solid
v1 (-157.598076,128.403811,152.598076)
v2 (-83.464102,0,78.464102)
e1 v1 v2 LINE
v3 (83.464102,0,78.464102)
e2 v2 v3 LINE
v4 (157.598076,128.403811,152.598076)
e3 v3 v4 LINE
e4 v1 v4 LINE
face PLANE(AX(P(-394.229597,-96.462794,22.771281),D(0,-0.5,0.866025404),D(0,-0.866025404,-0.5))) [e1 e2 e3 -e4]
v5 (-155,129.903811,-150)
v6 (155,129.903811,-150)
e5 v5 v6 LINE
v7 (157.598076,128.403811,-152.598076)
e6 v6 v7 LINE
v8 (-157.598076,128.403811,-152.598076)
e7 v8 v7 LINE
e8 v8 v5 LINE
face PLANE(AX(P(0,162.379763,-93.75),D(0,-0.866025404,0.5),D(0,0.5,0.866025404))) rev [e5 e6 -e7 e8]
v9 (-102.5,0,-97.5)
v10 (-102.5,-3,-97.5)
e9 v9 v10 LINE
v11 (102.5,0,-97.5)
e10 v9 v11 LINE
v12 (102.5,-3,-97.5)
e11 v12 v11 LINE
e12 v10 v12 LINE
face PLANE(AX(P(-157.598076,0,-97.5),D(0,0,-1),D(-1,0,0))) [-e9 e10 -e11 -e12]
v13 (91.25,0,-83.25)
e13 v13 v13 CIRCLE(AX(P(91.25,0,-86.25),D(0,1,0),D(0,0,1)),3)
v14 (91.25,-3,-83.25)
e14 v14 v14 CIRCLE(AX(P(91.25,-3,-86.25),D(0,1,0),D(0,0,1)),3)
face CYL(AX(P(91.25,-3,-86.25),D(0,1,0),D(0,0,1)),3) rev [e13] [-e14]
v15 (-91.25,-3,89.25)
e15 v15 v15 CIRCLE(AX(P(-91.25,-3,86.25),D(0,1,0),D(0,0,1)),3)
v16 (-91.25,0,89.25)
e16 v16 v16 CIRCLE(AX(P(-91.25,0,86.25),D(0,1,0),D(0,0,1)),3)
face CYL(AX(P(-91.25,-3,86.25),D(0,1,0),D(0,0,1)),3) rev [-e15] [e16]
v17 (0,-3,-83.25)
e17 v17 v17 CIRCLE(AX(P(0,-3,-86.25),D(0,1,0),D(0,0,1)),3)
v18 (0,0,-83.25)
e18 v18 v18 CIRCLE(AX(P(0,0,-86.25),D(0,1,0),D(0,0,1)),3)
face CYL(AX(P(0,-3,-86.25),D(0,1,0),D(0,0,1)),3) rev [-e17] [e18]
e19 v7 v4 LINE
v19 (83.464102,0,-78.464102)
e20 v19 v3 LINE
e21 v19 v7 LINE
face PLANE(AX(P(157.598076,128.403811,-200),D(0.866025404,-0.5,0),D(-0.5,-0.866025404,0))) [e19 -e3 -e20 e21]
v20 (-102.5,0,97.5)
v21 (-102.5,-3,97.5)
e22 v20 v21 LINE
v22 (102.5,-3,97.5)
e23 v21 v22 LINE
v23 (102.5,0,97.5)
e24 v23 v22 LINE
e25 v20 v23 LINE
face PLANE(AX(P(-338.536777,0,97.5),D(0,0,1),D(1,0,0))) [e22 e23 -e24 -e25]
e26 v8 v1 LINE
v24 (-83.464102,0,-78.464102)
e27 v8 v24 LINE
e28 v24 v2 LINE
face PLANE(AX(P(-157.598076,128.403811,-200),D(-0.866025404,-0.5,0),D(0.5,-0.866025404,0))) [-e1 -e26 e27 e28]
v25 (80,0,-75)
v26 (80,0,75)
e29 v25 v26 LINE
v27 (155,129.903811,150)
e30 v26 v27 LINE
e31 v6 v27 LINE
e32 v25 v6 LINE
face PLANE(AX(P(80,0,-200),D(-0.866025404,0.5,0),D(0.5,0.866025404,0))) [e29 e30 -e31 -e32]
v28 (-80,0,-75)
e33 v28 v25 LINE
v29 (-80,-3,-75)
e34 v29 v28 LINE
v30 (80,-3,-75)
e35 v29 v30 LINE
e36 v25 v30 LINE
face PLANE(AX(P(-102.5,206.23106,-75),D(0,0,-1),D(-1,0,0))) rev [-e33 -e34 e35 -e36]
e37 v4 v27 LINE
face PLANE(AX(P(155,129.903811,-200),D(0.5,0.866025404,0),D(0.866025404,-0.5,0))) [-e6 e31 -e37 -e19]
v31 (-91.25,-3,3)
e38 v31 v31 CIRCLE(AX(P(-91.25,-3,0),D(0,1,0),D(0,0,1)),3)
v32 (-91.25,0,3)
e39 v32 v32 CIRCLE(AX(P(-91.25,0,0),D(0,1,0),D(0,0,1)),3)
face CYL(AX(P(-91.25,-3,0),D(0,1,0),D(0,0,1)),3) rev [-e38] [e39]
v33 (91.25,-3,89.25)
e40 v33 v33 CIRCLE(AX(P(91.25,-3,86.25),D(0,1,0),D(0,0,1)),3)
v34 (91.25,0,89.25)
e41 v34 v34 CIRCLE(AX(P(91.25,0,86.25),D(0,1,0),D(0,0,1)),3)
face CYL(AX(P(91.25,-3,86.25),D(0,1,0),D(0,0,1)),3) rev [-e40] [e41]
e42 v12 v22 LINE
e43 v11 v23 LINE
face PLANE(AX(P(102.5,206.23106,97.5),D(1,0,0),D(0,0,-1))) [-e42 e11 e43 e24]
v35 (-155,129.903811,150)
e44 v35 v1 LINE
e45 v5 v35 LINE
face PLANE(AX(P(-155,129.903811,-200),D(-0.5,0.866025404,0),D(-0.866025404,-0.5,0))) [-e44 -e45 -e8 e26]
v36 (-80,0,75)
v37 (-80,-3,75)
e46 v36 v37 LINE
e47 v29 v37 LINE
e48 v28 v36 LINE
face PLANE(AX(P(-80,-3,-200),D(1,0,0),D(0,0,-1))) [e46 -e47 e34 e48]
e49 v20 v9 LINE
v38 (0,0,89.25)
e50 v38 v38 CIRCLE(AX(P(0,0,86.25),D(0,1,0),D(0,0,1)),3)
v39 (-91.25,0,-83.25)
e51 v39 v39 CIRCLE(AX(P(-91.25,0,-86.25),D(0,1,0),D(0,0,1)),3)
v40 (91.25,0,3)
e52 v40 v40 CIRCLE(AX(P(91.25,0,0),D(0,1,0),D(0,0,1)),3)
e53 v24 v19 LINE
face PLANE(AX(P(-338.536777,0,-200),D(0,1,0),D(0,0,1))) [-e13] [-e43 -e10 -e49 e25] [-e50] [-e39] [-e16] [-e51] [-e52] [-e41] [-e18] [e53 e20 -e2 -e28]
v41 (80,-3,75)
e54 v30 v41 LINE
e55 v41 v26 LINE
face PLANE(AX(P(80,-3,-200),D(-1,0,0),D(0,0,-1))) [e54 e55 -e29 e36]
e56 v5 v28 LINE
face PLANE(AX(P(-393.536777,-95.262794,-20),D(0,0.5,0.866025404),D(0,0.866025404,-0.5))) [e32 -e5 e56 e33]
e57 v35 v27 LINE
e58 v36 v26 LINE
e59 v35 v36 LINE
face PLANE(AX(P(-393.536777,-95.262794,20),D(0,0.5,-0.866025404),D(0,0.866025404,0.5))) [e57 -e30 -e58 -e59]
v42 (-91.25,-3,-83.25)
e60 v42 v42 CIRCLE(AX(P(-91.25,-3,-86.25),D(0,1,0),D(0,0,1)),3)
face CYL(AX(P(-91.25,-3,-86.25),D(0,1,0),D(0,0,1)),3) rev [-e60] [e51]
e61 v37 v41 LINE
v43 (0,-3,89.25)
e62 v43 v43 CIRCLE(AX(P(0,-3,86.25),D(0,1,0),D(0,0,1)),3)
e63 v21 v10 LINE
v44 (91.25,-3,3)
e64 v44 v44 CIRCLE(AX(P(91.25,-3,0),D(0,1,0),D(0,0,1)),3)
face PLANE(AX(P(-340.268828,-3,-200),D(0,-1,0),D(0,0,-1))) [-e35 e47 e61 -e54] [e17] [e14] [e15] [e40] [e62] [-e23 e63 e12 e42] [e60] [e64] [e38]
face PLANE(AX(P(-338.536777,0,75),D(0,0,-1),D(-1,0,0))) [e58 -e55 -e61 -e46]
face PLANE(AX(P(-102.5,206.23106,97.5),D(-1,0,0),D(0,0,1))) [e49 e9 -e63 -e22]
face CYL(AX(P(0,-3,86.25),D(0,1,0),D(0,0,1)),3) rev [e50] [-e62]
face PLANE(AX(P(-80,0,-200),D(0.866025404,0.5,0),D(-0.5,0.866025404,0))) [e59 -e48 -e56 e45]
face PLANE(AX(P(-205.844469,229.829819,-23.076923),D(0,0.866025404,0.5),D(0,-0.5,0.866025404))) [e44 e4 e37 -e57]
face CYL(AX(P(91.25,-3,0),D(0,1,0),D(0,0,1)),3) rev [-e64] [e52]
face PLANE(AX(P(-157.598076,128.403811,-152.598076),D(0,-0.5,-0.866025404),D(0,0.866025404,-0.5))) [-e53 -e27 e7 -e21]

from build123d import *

# Parameters (mm, degrees)
BOSS_EXTRUDE1_DEPTH   = 200
BOSS_EXTRUDE2_START   = -155
BOSS_EXTRUDE2_DEPTH   = 310
BOSS_EXTRUDE2_START_2 = 75
BOSS_EXTRUDE2_2_DEPTH = 77.598076211
CUT_EXTRUDE1_DEPTH    = 286.853377845
SKETCH4_W             = 315.196152422
SKETCH4_H             = 3
CUT_EXTRUDE2_DEPTH    = 373.124552005
SKETCH5_W             = 205
SKETCH5_H             = 22.5
BOSS_EXTRUDE3_DEPTH   = 3
SKETCH6_R             = 3
CUT_EXTRUDE3_DEPTH    = 255.947693633


with BuildPart() as part:
    # Sketch1 → Boss-Extrude1 (new, symmetric)
    with BuildSketch(Plane.XY):
        Polygon((-102.5, 0), (-102.5, -3), (-80, -3), (-80, 0), (-155, 129.903810568), (-157.598076211, 128.403810568), (-83.464101615, 0), align=None)
    extrude(amount=BOSS_EXTRUDE1_DEPTH, both=True)


with BuildPart() as body_2:
    # Mirror3: mirrored copy
    add(part.part.mirror(Plane(origin=(0, 0, 0), x_dir=(0, 0, 1), z_dir=(1, 0, 0))))


with BuildPart() as body_3:
    # Boss-Extrude2: read off the stored shape, not the designer's step
    # Boss-Extrude2 outline → Boss-Extrude2 (new body)
    with BuildSketch(Plane(origin=(0, 0, 0), x_dir=(0, 0, -1), z_dir=(1, 0, 0)).offset(BOSS_EXTRUDE2_START)):
        Polygon((-150, 129.903810568), (-152.598076211, 128.403810568), (-78.464101615, 0), (-97.5, 0), (-97.5, -3), (-75, -3), (-75, 0), align=None)
    extrude(amount=BOSS_EXTRUDE2_DEPTH)

    # Boss-Extrude2 2 outline → Boss-Extrude2 2 (cut)
    with BuildSketch(Plane.XY.offset(BOSS_EXTRUDE2_START_2)):
        Polygon((155, 129.903810568), (78.267949192, -3), (155, -3), align=None)
        Polygon((-155, 129.903810568), (-155, -3), (-78.267949192, -3), align=None)
    extrude(amount=BOSS_EXTRUDE2_2_DEPTH, mode=Mode.SUBTRACT)


with BuildPart() as body_4:
    # Mirror5: mirrored copy
    add(body_3.part.mirror(Plane.XY))


with BuildPart() as cut_extrude1_tool:
    # Sketch3 → Cut-Extrude1 (new, symmetric)
    with BuildSketch(Plane(origin=(0, 0, 0), x_dir=(0, 0, -1), z_dir=(1, 0, 0))):
        Polygon((-152.598076211, 128.403810568), (-78.464101615, 0), (-97.5, 0), (-97.5, -3), (-200, -3), (-200, 129.903810568), (-153.464101615, 129.903810568), align=None)
    cut_extrude1 = extrude(amount=CUT_EXTRUDE1_DEPTH, both=True)


with BuildPart() as part_1:
    add(part.part)

    # Cut-Extrude1: cut by cut_extrude1_tool
    add(cut_extrude1_tool.part, mode=Mode.SUBTRACT)


with BuildPart() as body_2_1:
    add(body_2.part)

    # Cut-Extrude1: cut by cut_extrude1_tool
    add(cut_extrude1_tool.part, mode=Mode.SUBTRACT)


with BuildPart() as cut_extrude2_tool:
    # Sketch4 → Cut-Extrude2 (new, through all)
    with BuildSketch(Plane(origin=(0, 162.37976321, 93.75), x_dir=(1, 0, 0), z_dir=(0, 0.8660254037844436, 0.4999999999999916))):
        with Locations((0, -66.451905284)):
            Rectangle(SKETCH4_W, SKETCH4_H)
    cut_extrude2 = extrude(amount=CUT_EXTRUDE2_DEPTH)


with BuildPart() as part_2:
    add(part_1.part)

    # Cut-Extrude2: cut by cut_extrude2_tool
    add(cut_extrude2_tool.part, mode=Mode.SUBTRACT)



with BuildPart() as body_2_2:
    add(body_2_1.part)

    # Cut-Extrude2: cut by cut_extrude2_tool
    add(cut_extrude2_tool.part, mode=Mode.SUBTRACT)


with BuildPart() as part_3:
    add(part_2.part)

    add(body_2_2.part)  # Boss-Extrude3 merges body 2

    add(body_3.part)  # Boss-Extrude3 merges body 3
    # Sketch5 → Boss-Extrude3 (add)
    with BuildSketch(Plane.XZ.offset(3)):
        with Locations((0, 86.25)):
            Rectangle(SKETCH5_W, SKETCH5_H)
    boss_extrude3 = extrude(amount=-BOSS_EXTRUDE3_DEPTH)

    # Mirror9: Cut-Extrude1, Cut-Extrude2 across plane
    add(cut_extrude1.mirror(Plane.XY), mode=Mode.SUBTRACT)
    add(cut_extrude2.mirror(Plane.XY), mode=Mode.SUBTRACT)

    # Mirror9 2: Boss-Extrude3 across plane
    add(boss_extrude3.mirror(Plane.XY))

    # Combine5: union body 4
    add(body_4.part)

    # Sketch6 → Cut-Extrude3 (cut, through all)
    with BuildSketch(Plane(origin=(0, 0, 0), x_dir=(1, 0, 0), z_dir=(0, 1, 0))):
        with Locations(Location((-91.25, 86.25, 0), (0, 0, 270))):
            Circle(SKETCH6_R)
        with Locations(Location((0, 86.25, 0), (0, 0, 270))):
            Circle(SKETCH6_R)
        with Locations(Location((91.25, 86.25, 0), (0, 0, 270))):
            Circle(SKETCH6_R)
        with Locations(Location((-91.25, 0, 0), (0, 0, 270))):
            Circle(SKETCH6_R)
        with Locations(Location((91.25, 0, 0), (0, 0, 270))):
            Circle(SKETCH6_R)
        with Locations(Location((91.25, -86.25, 0), (0, 0, 270))):
            Circle(SKETCH6_R)
        with Locations(Location((0, -86.25, 0), (0, 0, 270))):
            Circle(SKETCH6_R)
        with Locations(Location((-91.25, -86.25, 0), (0, 0, 270))):
            Circle(SKETCH6_R)
    extrude(amount=-CUT_EXTRUDE3_DEPTH, mode=Mode.SUBTRACT)


solid = part_3.part
